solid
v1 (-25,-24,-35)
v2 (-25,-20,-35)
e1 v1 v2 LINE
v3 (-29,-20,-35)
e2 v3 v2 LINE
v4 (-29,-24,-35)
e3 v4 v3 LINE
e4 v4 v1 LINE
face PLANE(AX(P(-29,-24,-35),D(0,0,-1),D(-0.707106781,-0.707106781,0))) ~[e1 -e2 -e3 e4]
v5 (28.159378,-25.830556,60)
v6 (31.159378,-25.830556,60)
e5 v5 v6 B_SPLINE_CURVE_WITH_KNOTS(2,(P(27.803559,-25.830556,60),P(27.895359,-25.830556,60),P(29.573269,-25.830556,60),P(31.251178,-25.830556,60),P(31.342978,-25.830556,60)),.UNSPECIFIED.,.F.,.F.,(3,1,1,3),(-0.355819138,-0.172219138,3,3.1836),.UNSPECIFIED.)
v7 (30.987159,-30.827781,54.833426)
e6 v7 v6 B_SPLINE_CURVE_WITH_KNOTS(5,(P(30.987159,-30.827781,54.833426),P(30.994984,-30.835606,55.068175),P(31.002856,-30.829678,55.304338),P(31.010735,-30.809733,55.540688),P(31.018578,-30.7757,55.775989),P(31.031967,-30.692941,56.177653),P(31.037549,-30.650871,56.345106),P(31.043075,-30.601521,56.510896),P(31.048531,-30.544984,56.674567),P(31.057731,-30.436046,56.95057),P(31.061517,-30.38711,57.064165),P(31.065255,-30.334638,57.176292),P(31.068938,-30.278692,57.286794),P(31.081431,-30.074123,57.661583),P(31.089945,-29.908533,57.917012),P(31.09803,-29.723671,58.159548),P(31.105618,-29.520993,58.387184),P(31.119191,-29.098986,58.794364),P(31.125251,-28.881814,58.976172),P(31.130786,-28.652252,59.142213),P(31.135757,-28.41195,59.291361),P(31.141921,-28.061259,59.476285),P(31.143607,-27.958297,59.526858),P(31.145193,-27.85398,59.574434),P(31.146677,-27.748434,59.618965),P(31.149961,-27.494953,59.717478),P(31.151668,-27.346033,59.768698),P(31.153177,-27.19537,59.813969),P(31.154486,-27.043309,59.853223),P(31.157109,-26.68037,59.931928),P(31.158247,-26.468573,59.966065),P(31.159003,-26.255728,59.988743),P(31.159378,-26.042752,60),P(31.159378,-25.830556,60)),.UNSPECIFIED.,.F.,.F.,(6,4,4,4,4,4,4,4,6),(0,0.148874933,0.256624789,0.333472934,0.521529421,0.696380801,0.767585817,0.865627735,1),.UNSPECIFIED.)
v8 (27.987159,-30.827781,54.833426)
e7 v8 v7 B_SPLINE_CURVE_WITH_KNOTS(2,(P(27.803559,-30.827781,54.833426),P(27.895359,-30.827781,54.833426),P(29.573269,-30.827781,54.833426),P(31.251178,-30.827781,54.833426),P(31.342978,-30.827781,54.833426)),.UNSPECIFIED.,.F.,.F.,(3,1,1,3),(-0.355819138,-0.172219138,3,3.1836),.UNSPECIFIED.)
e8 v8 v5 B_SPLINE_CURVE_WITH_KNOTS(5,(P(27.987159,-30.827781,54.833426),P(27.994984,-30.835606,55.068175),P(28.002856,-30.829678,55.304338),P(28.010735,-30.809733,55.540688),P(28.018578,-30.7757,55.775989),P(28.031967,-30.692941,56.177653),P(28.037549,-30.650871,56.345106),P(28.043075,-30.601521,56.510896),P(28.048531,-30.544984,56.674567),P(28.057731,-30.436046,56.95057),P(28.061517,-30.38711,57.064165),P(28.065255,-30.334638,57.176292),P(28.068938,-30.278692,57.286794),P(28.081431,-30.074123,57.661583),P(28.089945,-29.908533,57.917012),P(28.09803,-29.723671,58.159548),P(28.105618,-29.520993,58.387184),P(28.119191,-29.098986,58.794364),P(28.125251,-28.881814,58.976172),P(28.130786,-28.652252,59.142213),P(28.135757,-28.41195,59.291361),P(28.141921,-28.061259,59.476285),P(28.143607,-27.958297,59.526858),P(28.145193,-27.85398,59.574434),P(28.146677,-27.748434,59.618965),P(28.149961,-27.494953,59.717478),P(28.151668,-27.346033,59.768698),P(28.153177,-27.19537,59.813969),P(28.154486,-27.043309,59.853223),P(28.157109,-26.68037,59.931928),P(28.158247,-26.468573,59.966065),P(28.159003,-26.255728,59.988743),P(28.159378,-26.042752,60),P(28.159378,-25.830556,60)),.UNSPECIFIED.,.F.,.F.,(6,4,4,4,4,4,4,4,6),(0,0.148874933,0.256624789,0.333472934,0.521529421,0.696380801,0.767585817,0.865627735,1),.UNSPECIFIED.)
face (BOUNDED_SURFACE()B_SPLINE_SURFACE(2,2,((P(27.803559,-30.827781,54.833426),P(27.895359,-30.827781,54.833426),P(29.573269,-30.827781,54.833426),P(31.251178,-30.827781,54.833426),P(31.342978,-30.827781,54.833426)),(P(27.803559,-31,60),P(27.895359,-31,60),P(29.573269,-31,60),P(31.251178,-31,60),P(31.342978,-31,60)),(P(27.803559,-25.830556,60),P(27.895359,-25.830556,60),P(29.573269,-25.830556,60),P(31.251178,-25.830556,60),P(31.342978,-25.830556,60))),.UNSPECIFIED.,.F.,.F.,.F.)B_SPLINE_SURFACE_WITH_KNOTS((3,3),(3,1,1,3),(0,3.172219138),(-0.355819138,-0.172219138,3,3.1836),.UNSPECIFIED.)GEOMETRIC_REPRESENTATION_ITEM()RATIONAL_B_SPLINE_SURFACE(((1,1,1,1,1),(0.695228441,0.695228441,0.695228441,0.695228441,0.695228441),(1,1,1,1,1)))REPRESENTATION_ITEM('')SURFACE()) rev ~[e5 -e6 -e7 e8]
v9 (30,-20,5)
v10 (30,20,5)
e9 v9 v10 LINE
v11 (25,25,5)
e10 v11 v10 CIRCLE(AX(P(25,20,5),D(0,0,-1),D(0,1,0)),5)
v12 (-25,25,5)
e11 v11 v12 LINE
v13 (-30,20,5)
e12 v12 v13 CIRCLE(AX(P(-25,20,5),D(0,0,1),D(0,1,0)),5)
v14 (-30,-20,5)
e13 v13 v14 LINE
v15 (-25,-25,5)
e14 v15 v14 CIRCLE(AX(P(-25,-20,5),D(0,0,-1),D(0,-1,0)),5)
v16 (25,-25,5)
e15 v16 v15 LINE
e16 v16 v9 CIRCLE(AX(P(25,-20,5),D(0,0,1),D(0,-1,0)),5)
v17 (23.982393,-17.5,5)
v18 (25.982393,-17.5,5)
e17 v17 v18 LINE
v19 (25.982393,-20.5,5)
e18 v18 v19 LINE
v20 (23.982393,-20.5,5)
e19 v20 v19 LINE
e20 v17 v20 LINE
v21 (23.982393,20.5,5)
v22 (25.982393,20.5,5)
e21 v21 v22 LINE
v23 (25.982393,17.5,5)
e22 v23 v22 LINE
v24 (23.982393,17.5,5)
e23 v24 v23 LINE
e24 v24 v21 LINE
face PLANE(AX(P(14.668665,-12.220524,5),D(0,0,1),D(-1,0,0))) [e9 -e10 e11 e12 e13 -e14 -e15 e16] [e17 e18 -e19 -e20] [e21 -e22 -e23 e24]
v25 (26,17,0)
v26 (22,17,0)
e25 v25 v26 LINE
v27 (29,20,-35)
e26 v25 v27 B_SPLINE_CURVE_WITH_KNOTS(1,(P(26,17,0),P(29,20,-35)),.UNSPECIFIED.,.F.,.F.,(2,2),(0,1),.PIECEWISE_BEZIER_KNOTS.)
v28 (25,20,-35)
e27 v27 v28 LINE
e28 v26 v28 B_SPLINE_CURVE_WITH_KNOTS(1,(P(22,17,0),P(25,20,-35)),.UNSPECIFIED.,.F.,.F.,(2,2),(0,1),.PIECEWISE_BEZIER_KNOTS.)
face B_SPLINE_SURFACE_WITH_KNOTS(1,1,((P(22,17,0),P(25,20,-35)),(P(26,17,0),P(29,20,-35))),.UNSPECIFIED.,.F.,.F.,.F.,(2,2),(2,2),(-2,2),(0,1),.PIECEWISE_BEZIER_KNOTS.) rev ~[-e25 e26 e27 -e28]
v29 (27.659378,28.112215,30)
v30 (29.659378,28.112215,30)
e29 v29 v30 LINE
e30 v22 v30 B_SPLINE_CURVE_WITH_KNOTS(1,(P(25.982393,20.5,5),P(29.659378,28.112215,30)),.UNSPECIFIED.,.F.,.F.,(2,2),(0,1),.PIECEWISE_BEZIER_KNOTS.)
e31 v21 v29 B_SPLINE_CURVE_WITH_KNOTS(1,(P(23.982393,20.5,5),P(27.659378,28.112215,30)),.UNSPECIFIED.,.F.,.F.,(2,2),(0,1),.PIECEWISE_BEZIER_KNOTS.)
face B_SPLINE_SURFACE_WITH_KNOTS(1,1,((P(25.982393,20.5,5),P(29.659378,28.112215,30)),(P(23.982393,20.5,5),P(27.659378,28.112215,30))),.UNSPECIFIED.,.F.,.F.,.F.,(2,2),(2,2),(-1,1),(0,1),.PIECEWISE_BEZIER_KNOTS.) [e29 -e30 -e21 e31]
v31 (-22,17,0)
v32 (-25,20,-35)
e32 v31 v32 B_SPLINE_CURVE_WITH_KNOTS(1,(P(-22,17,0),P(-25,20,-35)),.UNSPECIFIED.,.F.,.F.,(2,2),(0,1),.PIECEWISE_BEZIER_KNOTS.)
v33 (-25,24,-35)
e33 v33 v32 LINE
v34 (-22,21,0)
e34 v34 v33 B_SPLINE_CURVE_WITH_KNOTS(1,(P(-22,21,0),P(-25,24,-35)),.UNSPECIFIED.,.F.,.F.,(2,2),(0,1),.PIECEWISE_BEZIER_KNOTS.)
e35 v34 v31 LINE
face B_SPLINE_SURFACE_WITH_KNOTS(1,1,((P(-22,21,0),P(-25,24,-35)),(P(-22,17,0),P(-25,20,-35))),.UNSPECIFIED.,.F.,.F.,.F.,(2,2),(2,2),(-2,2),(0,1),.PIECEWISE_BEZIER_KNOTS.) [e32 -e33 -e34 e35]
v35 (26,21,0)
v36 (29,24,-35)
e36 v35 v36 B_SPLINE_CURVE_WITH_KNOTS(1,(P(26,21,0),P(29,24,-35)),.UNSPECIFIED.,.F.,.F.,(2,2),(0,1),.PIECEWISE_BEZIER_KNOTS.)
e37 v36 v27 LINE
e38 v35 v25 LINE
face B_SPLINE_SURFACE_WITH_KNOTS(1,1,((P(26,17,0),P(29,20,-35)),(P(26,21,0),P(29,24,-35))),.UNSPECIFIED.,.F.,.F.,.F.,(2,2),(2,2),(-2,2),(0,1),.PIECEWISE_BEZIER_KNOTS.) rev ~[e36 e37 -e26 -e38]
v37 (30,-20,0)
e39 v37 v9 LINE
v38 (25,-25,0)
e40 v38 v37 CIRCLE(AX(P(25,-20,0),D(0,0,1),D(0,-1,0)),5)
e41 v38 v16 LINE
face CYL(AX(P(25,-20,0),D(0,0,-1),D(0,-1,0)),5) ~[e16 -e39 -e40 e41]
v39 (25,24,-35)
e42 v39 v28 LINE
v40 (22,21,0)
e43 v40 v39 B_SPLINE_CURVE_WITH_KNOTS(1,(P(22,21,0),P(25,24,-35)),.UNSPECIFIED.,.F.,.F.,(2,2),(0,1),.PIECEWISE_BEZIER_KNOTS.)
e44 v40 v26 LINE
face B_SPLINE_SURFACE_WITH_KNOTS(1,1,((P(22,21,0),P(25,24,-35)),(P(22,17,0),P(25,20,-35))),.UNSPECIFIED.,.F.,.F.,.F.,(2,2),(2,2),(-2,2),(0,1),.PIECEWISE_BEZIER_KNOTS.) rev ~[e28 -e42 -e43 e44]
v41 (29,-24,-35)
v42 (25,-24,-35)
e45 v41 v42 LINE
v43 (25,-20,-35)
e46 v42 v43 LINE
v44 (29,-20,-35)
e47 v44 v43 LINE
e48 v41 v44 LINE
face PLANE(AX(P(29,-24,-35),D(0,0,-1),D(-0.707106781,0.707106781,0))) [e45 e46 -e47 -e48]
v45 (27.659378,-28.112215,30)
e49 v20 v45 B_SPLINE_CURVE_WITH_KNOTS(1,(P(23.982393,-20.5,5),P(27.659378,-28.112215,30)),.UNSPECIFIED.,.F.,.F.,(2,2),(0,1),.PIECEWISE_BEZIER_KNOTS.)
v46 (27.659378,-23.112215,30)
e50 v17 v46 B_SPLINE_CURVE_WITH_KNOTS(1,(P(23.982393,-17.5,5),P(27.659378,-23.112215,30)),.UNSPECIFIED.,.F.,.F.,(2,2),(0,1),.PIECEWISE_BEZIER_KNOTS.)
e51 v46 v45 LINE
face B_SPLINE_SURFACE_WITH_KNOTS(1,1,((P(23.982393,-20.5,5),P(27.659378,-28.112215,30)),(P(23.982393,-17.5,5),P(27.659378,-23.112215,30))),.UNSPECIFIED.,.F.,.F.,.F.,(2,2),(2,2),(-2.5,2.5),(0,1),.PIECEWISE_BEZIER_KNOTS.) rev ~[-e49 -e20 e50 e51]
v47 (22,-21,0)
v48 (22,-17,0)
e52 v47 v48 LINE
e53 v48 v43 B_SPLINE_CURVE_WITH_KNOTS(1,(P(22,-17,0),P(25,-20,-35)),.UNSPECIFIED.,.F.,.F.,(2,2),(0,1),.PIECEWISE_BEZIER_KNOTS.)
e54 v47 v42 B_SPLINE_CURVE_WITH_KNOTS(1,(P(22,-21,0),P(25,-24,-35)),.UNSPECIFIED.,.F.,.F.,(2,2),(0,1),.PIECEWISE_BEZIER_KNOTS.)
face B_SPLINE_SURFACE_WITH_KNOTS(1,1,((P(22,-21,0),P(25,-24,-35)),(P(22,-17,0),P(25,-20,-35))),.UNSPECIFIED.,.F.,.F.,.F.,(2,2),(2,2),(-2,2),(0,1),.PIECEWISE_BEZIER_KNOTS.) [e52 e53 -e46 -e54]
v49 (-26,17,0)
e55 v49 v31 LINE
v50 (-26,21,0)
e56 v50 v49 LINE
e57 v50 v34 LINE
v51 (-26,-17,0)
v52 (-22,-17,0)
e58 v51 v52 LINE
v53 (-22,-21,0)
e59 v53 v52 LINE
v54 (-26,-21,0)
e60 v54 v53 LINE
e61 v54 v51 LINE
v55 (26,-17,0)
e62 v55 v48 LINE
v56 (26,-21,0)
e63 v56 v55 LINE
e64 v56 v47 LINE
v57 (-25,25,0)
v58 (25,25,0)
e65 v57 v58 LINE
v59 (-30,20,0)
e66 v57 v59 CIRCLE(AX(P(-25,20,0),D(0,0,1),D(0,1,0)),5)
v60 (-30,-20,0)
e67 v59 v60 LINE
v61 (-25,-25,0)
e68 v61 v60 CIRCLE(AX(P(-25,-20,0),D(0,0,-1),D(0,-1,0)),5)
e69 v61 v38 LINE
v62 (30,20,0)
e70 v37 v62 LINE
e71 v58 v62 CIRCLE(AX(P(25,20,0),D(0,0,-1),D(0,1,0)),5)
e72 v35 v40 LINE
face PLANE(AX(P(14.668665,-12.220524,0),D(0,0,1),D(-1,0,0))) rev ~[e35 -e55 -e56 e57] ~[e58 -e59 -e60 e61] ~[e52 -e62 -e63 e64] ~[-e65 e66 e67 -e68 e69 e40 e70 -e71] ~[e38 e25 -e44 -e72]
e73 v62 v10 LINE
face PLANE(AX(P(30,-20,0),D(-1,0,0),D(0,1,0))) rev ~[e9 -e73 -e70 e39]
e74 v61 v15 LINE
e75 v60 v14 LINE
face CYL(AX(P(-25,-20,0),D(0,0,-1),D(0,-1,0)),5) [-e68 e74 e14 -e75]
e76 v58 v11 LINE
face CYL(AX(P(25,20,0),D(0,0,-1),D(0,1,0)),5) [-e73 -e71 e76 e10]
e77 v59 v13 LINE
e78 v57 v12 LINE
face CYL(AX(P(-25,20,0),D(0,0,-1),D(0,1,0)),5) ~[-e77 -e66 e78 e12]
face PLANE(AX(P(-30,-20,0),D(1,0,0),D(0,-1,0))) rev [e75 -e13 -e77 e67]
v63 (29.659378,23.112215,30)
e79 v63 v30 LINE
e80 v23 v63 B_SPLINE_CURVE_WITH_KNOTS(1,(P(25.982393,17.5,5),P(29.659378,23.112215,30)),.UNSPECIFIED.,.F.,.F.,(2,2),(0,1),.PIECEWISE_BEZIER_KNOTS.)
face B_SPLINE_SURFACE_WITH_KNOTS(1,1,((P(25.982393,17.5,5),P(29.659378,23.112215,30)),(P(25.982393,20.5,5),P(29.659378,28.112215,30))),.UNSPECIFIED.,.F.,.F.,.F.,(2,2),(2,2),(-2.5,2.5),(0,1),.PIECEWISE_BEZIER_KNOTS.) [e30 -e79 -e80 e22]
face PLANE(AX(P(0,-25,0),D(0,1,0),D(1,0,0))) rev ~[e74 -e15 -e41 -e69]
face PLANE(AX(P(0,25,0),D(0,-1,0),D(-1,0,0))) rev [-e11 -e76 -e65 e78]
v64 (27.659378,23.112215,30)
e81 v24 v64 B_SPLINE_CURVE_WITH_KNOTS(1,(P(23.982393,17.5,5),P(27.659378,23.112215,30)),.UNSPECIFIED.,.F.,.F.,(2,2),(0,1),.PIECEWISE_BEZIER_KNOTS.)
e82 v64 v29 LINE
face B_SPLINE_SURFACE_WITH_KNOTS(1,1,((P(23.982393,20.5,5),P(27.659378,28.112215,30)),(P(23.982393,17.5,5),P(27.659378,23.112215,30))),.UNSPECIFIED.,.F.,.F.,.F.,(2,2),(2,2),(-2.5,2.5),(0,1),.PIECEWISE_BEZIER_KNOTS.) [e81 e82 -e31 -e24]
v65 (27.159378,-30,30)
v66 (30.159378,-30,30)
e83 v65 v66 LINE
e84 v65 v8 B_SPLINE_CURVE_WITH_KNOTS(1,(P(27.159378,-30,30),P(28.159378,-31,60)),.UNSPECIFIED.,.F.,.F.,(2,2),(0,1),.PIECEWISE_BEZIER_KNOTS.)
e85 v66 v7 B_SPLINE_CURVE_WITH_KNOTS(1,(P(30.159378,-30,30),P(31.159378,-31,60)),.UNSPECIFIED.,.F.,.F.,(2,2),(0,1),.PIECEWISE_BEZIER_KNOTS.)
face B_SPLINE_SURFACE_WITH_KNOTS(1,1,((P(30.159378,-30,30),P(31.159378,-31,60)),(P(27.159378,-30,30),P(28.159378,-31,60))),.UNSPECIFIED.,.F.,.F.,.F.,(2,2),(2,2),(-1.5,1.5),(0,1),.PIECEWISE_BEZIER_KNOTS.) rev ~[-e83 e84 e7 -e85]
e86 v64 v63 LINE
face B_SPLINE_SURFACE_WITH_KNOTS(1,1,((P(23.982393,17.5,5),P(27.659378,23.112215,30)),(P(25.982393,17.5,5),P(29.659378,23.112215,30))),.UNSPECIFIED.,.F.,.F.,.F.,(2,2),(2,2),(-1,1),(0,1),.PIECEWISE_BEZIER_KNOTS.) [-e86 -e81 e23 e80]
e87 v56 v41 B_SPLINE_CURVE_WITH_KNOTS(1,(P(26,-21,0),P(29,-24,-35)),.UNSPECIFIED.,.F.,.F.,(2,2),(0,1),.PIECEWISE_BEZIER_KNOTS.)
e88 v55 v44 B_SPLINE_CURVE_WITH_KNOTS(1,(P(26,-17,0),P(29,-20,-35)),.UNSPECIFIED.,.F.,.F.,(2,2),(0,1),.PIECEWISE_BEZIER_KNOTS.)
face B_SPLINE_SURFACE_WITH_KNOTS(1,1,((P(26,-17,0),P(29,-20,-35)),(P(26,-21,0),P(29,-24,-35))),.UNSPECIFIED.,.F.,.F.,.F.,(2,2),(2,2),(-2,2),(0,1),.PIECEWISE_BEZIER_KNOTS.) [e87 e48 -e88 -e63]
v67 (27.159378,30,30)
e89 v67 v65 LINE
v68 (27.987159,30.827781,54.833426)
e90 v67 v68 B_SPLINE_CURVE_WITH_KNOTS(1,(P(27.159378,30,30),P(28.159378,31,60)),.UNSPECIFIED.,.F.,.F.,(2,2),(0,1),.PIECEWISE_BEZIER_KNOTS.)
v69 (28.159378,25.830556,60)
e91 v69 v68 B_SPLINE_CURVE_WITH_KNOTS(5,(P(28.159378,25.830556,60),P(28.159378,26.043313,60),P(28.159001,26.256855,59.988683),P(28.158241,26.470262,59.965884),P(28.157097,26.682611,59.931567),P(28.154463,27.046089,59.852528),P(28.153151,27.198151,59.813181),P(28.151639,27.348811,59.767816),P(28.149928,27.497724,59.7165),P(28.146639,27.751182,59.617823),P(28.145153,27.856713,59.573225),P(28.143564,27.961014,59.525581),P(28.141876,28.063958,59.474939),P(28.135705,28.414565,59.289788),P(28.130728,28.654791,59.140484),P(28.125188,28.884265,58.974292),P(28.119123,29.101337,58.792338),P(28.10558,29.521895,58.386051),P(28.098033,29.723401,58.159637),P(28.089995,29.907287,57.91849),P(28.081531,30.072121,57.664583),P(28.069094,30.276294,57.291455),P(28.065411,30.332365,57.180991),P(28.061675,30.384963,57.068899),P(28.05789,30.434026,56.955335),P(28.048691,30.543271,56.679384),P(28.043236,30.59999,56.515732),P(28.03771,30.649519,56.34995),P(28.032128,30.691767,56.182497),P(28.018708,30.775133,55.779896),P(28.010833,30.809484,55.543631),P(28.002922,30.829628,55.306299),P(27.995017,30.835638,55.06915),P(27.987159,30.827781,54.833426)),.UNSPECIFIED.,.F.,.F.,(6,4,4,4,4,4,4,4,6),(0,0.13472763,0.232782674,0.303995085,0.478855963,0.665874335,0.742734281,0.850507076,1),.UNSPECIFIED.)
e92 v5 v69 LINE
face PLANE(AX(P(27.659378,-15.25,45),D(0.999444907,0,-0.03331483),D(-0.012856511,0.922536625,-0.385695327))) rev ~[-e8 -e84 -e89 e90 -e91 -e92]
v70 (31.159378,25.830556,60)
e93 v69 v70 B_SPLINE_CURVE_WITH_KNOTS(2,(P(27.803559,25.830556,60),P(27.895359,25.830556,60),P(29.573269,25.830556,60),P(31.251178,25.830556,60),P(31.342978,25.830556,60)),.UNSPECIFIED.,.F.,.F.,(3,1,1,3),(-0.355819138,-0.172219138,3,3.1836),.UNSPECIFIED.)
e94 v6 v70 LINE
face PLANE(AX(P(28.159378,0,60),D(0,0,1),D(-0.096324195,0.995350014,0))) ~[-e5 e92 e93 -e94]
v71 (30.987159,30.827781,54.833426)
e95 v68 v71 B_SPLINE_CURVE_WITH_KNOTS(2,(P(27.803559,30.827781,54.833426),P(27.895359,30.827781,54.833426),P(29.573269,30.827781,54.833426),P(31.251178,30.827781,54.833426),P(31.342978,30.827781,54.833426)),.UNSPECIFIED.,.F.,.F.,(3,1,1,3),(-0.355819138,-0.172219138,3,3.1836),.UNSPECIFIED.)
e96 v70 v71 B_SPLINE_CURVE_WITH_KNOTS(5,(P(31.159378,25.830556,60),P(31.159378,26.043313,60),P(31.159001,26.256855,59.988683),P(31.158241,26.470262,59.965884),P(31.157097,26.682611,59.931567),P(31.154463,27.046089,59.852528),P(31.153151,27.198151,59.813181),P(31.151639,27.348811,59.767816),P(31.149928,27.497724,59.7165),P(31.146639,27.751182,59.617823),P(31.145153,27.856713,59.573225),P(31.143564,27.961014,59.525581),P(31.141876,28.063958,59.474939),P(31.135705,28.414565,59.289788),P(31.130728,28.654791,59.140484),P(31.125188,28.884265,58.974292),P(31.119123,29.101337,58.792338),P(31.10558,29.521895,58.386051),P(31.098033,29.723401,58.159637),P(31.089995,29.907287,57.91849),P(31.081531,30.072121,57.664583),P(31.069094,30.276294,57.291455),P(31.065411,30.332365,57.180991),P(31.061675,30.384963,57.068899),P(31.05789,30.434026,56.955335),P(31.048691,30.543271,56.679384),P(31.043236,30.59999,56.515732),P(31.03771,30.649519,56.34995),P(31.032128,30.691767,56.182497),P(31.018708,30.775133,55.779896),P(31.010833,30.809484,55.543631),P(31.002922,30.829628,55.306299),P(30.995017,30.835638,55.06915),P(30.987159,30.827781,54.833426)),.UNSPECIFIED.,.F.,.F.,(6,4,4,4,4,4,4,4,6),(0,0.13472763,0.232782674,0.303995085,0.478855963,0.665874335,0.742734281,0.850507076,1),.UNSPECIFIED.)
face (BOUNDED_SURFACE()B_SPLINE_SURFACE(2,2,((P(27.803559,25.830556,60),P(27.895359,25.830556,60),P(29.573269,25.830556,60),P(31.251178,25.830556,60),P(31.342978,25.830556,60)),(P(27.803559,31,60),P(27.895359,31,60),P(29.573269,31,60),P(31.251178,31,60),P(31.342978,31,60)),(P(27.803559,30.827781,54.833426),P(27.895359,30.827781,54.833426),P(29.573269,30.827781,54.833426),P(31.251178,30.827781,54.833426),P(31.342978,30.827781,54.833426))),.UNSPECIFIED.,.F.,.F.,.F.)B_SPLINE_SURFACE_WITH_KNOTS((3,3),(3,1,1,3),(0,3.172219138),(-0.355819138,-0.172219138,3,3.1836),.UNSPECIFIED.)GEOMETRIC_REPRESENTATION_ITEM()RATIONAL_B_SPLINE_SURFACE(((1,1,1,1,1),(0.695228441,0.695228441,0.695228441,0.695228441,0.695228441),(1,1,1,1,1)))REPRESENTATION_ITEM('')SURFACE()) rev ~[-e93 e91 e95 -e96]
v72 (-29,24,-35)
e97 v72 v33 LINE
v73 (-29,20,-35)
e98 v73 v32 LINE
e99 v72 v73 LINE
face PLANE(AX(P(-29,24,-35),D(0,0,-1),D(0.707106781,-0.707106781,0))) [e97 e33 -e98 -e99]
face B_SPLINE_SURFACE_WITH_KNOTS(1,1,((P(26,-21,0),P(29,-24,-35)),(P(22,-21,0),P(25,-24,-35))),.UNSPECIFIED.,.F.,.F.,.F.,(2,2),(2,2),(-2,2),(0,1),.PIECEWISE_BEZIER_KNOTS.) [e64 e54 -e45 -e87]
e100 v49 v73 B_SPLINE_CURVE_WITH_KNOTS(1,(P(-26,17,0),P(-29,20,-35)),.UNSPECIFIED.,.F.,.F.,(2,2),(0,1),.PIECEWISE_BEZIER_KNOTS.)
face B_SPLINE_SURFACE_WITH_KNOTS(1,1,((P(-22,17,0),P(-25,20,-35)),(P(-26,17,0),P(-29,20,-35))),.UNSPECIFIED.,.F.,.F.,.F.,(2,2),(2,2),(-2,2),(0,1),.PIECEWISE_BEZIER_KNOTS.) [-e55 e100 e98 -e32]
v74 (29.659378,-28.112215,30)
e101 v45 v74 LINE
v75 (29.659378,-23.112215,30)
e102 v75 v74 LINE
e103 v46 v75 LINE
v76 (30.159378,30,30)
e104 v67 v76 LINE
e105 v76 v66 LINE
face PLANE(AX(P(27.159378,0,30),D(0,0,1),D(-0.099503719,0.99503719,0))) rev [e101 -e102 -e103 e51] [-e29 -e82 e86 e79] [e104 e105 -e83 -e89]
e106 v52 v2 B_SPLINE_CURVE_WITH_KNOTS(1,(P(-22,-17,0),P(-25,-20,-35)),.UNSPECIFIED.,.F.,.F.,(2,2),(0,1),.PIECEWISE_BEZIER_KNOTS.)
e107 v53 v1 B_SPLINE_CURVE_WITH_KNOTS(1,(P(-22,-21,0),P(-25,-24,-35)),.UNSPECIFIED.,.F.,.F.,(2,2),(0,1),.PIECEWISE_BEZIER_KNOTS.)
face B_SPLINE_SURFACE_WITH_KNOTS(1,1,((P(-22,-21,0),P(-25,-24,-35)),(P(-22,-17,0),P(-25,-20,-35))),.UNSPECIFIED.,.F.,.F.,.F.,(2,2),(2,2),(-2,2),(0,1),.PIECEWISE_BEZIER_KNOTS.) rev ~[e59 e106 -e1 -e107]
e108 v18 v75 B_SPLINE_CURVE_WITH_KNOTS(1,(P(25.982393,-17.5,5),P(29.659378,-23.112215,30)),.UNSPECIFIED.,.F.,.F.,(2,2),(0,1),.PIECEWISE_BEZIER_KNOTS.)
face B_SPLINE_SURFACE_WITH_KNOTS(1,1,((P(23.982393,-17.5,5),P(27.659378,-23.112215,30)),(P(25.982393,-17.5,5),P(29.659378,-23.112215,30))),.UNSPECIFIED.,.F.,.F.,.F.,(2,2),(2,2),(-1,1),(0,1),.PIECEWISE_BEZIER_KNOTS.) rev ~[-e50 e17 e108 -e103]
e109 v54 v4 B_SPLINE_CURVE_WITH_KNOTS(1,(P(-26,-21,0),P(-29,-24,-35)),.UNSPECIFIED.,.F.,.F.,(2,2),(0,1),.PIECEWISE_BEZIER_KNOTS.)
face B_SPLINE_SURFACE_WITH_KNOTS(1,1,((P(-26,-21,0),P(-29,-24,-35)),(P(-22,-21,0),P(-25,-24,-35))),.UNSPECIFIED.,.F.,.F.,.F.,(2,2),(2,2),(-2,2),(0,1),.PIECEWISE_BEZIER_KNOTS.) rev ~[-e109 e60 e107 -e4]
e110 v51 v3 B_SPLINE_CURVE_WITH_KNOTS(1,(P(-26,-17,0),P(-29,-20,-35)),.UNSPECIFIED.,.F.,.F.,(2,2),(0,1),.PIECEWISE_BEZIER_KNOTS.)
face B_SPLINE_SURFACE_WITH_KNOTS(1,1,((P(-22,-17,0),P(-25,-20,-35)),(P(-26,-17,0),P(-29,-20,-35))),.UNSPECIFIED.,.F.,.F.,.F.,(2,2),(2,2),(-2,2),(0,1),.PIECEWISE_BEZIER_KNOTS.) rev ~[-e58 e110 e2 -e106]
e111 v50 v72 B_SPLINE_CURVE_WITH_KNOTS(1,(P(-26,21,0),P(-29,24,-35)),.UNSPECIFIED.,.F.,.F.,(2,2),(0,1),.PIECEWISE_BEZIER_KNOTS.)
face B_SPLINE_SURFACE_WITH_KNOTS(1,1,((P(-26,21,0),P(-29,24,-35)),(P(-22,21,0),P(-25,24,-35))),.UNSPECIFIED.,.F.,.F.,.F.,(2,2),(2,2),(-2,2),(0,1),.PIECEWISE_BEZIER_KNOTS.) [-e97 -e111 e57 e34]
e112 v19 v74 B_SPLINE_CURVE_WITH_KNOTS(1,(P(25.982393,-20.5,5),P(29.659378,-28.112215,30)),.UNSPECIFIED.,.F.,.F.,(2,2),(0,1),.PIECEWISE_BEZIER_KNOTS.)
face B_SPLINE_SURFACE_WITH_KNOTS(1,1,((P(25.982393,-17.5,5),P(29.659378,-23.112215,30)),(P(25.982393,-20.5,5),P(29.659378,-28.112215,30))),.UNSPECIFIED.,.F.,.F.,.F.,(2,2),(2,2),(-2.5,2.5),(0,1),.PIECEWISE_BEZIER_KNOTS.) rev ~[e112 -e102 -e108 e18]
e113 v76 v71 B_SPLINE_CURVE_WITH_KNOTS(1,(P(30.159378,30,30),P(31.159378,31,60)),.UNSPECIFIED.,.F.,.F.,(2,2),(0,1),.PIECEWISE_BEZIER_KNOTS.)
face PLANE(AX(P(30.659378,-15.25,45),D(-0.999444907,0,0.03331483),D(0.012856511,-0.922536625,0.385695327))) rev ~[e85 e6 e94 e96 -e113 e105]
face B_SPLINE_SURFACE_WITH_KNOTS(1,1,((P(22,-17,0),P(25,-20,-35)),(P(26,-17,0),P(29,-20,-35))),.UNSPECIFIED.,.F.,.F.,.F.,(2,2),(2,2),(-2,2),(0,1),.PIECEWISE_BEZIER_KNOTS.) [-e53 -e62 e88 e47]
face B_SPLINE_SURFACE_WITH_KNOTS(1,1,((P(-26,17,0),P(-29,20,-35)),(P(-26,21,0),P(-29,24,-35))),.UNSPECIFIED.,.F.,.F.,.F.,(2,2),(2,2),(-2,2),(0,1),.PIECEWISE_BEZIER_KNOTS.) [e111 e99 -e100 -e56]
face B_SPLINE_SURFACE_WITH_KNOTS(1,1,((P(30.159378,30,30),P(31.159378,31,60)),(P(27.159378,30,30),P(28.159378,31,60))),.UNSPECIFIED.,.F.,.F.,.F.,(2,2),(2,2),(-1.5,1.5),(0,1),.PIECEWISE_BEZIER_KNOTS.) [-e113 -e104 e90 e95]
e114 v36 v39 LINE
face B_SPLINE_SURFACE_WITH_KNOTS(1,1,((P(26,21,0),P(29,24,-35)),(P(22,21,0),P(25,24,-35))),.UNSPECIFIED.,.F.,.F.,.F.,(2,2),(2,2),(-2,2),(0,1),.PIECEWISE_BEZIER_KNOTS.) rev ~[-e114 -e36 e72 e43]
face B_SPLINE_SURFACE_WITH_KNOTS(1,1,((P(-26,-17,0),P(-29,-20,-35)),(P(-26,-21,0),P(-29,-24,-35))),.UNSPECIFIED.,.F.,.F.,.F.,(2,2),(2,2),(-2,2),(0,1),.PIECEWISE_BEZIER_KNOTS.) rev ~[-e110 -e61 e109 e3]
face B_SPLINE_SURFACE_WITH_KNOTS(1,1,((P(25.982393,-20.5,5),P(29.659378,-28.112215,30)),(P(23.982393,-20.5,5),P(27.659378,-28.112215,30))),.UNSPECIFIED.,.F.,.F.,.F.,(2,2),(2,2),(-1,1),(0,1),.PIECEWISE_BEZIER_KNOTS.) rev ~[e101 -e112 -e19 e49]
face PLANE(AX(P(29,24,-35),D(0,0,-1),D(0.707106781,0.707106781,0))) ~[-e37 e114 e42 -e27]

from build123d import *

# Parameters (mm, degrees)
F1_DEPTH = 5
F2_W     = 4
F2_H     = 4
F4_W     = 4
F4_H     = 4
F7_W     = 2
F7_H     = 3
F9_W     = 2
F9_H     = 5
F11_W    = 3
F11_H    = 30
F13_W    = 3
F13_H    = 31
F16_R    = 5


with BuildPart() as f1:
    # F0 (on Top) → F1 (new body)
    with BuildSketch(Plane.XY):
        with BuildLine():
            Line((-30, 0), (0, 0))
            Line((0, 0), (0, 25))
            Line((0, 25), (-25, 25))
            ThreePointArc((-25, 25), (-28.5355339059, 23.5355339059), (-30, 20))
            Line((-30, 20), (-30, 0))
        make_face()
    extrude(amount=F1_DEPTH)

    # F2 (on face) → F5 section 0
    with BuildSketch(Plane(origin=(0, 0, 0), x_dir=(1, 0, 0), z_dir=(0, 0, -1))):
        with Locations((-24, -19)):
            Rectangle(F2_W, F2_H)
    # F4 (on offset) → F5 section 1
    with BuildSketch(Plane(origin=(0, 0, -35), x_dir=(1, 0, 0), z_dir=(0, 0, -1))):
        with Locations((-27, -22)):
            Rectangle(F4_W, F4_H)
    loft()

    # F6: F1 across plane


with BuildPart() as f1_1:
    add(f1.part)
    add(f1.part.mirror(Plane.YZ))

    # F7 (on face) → F10 section 0
    with BuildSketch(Plane.XY.offset(5)):
        with Locations((24.9823927879, 19)):
            Rectangle(F7_W, F7_H)
    # F9 (on offset) → F10 section 1
    with BuildSketch(Plane.XY.offset(30)):
        with Locations((28.6593784243, 25.6122151948)):
            Rectangle(F9_W, F9_H)
    loft()

    # F11 (on offset) → F14 section 0
    with BuildSketch(Plane.XY.offset(30)):
        with Locations((28.6593784243, 15)):
            Rectangle(F11_W, F11_H)
    # F13 (on offset) → F14 section 1
    with BuildSketch(Plane.XY.offset(60)):
        with Locations((29.6593784243, 15.5)):
            Rectangle(F13_W, F13_H)
    loft()

    # F15: F1 across plane


with BuildPart() as f1_2:
    add(f1_1.part)
    add(f1_1.part.mirror(Plane.XZ))

    # F16
    f16_edges = [f1_2.edges().sort_by_distance(p)[0] for p in [
        (29.659378, 31, 60),
        (29.659378, -31, 60),
    ]]
    fillet(f16_edges, radius=F16_R)

    # F17: F1 across plane


with BuildPart() as f1_3:
    add(f1_2.part)
    add(f1_2.part.mirror(Plane.XZ))


solid = f1_3.part
